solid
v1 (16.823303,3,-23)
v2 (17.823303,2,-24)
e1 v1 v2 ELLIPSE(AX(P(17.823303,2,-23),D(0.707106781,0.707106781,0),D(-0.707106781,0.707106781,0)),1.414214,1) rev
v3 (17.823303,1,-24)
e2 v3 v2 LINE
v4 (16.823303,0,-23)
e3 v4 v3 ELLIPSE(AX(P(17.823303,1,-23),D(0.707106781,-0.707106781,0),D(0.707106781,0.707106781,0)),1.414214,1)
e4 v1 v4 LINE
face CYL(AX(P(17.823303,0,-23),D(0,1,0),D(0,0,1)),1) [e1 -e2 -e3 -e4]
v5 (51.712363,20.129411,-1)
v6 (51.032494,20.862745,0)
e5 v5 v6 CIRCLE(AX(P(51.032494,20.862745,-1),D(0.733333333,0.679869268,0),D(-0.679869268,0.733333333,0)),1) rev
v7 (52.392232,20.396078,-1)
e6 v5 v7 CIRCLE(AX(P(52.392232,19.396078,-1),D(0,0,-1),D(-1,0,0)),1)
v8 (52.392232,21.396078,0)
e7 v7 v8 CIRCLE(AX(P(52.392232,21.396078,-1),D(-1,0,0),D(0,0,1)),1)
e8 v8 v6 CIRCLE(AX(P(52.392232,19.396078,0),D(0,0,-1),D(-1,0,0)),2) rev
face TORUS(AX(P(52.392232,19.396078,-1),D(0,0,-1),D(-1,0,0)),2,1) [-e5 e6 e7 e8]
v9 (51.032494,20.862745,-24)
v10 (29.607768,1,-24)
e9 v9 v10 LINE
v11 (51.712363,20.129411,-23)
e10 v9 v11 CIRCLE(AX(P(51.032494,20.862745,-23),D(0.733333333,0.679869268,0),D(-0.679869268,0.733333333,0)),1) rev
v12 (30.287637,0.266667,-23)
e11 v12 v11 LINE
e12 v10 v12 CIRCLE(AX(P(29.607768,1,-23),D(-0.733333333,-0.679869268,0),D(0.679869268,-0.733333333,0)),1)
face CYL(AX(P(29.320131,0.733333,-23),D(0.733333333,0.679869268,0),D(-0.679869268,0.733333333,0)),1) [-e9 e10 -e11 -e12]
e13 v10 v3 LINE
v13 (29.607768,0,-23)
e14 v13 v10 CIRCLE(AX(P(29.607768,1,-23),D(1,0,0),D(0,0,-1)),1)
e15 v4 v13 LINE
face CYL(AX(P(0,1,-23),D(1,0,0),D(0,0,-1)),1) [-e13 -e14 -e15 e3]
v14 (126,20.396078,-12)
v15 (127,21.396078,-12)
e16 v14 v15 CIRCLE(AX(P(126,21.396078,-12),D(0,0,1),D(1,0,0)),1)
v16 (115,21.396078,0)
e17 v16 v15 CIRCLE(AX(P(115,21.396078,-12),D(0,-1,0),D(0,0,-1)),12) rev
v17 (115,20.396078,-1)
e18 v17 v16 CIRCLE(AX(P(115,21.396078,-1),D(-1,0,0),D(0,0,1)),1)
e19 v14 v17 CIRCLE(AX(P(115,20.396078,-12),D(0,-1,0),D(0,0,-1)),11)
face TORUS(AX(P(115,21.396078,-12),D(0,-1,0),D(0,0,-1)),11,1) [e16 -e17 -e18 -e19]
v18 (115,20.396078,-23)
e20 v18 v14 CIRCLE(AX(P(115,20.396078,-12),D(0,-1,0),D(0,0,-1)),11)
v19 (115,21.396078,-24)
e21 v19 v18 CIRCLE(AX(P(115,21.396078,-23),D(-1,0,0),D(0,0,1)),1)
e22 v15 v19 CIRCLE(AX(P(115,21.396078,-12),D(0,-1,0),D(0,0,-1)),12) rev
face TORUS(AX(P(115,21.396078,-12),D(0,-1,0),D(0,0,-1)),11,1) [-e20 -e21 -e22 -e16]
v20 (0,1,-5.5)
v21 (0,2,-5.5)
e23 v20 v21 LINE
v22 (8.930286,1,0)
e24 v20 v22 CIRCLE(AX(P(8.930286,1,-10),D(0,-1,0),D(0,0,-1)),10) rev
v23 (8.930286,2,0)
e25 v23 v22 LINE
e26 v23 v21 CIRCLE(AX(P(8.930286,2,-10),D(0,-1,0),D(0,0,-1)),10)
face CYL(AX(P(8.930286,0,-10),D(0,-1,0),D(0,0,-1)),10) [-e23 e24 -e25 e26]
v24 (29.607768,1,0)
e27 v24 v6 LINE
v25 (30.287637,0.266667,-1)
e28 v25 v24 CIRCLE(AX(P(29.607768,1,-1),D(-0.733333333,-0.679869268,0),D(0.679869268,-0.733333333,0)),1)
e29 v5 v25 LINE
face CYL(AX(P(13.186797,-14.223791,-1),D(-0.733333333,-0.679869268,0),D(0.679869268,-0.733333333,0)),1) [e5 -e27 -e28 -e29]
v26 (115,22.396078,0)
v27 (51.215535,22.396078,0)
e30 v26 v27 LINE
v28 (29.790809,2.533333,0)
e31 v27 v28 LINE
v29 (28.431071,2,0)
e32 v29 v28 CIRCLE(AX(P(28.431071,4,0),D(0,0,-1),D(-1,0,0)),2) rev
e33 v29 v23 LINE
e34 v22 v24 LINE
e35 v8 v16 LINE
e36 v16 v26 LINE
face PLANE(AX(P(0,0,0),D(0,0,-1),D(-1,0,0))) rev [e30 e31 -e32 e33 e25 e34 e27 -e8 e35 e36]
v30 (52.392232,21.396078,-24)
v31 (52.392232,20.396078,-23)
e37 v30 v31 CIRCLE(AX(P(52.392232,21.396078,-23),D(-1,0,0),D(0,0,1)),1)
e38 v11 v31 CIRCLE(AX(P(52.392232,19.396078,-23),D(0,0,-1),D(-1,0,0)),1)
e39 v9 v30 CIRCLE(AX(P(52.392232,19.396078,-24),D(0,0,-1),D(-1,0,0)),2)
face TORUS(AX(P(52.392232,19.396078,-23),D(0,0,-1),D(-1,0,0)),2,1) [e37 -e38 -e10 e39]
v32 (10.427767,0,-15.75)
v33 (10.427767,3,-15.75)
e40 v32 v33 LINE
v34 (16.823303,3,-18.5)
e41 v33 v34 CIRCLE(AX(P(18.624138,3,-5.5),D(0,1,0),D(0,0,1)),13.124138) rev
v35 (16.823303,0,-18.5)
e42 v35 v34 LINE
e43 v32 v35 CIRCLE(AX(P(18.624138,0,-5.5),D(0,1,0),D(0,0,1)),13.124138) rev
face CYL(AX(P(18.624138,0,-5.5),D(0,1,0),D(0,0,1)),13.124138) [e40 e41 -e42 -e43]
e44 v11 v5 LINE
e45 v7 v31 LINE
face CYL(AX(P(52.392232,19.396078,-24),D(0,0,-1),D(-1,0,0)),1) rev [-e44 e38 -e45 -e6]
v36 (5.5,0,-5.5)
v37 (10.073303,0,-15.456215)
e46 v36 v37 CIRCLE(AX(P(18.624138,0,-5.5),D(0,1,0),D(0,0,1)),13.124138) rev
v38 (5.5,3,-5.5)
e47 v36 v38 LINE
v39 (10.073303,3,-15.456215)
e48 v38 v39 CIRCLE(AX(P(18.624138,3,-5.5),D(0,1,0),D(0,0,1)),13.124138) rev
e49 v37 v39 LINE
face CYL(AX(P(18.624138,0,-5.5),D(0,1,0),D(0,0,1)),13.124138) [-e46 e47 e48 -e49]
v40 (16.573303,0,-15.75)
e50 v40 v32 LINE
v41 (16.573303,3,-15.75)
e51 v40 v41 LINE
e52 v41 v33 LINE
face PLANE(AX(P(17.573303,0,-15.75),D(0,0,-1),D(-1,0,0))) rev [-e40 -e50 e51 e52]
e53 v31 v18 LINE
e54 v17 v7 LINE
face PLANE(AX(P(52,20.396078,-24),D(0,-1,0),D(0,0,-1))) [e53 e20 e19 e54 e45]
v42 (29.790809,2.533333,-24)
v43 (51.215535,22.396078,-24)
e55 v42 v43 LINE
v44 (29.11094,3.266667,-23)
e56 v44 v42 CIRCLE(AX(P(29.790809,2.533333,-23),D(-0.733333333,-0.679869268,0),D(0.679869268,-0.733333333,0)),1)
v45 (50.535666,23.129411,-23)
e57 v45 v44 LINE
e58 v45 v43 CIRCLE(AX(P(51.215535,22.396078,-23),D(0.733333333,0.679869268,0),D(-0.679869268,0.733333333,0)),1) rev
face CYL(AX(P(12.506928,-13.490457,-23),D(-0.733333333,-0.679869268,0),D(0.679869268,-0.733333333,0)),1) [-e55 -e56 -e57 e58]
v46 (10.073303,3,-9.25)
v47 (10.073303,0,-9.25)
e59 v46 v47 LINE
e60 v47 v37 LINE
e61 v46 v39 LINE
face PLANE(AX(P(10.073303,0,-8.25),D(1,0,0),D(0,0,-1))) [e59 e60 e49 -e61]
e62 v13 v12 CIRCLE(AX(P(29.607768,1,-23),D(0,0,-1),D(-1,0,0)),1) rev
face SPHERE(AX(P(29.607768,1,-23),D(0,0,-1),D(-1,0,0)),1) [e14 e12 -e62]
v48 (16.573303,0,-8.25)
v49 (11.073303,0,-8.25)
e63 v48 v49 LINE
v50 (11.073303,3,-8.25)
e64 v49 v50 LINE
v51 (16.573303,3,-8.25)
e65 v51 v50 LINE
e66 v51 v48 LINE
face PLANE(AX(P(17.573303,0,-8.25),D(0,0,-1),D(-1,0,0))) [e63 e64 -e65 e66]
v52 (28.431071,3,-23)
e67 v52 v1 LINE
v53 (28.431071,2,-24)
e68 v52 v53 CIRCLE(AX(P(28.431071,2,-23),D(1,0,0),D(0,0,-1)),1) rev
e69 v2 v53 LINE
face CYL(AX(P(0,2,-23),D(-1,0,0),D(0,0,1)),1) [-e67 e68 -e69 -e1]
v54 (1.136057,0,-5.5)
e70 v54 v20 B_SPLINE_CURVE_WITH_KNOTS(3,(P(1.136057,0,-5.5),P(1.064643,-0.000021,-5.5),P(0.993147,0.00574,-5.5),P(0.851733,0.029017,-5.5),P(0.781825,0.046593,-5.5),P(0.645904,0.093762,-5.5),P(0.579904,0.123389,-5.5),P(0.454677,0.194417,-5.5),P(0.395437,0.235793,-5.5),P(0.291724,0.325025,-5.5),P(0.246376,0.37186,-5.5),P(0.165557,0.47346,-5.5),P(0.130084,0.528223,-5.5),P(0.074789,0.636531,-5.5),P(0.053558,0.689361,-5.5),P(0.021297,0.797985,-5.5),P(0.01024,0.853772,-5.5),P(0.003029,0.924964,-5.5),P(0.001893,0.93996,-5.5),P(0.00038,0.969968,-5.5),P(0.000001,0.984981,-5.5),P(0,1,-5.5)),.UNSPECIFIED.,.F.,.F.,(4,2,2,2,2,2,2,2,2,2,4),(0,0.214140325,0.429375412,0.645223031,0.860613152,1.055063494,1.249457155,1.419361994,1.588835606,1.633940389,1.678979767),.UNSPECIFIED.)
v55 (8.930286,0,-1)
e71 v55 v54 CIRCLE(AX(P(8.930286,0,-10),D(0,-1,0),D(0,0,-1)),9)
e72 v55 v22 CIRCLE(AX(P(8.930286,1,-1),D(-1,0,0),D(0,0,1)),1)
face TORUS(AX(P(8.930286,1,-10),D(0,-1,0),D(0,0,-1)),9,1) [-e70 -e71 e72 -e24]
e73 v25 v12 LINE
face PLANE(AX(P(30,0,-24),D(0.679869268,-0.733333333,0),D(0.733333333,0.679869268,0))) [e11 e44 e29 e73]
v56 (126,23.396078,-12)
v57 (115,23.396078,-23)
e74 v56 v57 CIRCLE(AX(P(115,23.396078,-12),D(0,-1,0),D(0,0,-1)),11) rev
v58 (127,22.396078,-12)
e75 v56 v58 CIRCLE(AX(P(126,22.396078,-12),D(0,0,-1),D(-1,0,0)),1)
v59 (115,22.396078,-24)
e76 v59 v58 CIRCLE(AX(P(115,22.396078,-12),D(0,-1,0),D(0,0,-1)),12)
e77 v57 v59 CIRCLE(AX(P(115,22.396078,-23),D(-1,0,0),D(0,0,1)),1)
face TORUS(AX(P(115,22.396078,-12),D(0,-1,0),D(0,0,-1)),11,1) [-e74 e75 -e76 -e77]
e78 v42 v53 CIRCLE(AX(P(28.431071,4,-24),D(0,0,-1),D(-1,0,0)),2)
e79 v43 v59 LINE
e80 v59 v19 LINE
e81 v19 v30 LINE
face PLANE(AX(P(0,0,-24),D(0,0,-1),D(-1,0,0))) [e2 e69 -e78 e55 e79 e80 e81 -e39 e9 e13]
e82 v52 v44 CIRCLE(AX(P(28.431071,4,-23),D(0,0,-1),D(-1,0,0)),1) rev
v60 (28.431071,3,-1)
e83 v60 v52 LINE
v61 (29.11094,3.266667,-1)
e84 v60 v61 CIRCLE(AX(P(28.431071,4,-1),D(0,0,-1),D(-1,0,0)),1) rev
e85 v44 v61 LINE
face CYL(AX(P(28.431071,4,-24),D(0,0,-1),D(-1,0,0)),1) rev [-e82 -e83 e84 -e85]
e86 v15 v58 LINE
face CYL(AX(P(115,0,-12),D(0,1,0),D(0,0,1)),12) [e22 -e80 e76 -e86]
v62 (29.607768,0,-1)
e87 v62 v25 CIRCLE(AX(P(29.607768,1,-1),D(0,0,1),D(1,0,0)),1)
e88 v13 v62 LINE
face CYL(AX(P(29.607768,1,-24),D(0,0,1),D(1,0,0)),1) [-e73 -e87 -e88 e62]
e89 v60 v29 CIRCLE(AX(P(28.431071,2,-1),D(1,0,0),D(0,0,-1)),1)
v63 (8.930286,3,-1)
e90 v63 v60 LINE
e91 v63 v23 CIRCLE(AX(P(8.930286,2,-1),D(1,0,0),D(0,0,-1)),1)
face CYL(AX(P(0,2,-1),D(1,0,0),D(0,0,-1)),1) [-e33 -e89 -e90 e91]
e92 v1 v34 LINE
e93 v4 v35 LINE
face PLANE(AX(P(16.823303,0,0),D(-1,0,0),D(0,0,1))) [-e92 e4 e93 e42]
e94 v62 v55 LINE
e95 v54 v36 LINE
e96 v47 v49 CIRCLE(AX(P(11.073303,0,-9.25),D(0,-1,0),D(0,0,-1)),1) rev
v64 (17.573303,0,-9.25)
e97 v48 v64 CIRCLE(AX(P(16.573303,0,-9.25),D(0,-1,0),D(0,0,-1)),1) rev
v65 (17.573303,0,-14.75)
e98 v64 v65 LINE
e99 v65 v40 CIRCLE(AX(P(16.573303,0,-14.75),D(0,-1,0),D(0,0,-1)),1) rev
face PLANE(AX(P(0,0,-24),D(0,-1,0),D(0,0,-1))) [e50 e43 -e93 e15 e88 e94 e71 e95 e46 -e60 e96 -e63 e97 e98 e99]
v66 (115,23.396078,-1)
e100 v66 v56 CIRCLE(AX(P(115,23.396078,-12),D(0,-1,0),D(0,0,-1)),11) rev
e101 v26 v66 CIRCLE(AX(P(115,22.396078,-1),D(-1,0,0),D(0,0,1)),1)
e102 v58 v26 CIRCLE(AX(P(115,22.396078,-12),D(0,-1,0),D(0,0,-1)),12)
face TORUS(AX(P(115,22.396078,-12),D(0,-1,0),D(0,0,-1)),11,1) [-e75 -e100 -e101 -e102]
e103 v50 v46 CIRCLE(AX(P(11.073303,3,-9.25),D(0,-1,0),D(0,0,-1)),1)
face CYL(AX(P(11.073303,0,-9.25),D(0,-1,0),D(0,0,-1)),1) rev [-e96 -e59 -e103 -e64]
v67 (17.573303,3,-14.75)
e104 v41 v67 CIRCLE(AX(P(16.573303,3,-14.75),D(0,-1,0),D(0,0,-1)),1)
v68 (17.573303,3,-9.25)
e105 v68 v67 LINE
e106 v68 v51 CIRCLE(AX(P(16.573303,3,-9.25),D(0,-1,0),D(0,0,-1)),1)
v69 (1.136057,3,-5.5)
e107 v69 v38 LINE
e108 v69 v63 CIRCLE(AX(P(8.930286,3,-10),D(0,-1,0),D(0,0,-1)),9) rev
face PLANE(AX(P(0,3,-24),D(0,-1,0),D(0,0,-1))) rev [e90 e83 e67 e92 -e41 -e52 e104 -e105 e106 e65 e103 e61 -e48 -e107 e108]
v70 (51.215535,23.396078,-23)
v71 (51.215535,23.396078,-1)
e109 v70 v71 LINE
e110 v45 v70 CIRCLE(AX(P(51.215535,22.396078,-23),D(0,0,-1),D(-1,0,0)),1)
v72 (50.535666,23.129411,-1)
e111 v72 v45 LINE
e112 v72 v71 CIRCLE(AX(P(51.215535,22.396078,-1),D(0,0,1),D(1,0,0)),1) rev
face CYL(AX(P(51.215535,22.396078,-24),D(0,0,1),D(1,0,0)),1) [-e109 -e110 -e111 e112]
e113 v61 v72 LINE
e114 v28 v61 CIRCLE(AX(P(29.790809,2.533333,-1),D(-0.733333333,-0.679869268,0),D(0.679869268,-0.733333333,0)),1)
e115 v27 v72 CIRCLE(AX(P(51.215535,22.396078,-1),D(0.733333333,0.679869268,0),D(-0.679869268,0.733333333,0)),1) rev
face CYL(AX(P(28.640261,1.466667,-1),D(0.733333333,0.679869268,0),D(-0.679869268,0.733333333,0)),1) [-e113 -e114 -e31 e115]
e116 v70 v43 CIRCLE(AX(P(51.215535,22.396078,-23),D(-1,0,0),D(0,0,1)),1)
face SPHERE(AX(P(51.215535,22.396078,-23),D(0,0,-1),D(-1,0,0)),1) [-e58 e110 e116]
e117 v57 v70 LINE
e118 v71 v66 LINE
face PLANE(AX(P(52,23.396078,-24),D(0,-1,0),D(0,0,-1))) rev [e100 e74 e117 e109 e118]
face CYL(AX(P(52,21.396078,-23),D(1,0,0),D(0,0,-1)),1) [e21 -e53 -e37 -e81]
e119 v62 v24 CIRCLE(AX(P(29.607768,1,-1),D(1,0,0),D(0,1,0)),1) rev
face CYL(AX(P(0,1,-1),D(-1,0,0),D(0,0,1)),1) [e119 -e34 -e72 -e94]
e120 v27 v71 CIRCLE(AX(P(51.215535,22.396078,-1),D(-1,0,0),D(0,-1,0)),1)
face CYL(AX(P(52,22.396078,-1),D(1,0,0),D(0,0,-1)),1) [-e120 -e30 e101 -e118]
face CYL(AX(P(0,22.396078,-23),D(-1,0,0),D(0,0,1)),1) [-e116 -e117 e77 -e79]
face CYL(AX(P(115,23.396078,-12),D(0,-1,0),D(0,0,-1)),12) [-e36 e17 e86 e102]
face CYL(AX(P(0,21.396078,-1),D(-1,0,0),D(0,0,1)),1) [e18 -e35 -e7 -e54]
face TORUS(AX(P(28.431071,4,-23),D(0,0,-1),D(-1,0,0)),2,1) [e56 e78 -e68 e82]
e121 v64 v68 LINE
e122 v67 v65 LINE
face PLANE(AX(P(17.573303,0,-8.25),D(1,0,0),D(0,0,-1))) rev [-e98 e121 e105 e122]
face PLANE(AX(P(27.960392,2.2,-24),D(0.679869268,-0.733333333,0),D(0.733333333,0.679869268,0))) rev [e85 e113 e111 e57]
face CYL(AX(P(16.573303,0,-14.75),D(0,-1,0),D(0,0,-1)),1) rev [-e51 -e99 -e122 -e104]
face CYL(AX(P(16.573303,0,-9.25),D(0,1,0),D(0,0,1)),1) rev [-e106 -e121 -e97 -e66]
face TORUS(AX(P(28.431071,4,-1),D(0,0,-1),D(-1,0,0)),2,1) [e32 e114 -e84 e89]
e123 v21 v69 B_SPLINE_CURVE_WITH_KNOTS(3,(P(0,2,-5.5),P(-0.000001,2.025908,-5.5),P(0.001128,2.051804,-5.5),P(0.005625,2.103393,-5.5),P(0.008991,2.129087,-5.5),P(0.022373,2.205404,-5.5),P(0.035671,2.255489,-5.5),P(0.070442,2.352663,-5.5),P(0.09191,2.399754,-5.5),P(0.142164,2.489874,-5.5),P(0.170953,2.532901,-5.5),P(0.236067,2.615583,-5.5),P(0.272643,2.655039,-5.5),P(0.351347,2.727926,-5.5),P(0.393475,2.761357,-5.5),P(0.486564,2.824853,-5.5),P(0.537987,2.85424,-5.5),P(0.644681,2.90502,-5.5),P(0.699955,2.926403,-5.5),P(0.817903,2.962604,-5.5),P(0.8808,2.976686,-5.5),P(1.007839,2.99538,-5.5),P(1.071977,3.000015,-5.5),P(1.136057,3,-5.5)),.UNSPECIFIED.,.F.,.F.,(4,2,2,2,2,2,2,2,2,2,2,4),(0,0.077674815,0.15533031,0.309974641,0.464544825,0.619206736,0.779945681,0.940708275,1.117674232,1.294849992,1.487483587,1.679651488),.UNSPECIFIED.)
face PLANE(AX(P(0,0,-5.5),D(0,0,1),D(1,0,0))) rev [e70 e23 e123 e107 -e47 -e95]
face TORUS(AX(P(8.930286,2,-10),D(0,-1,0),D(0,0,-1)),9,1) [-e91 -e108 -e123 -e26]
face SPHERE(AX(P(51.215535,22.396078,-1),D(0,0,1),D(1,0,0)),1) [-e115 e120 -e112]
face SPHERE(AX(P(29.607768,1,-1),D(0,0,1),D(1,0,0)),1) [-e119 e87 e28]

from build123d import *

# Parameters (mm, degrees)
EXTRUDE_THIN1_DEPTH = 24
CUT_EXTRUDE1_DEPTH  = 131.847239176
FILLET1_R           = 10
FILLET2_R           = 12
FILLET3_R           = 1
FILLET4_R           = 1


# Some blends are built 0.0001 mm under size
with BuildPart() as part:
    # Sketch1 → Extrude-Thin1 (new body)
    with BuildSketch(Plane.XY):
        Polygon((0, 0), (30, 0), (52, 20.396078054), (127, 20.396078054), (127, 23.396078054), (50.823303189, 23.396078054), (28.823303189, 3), (0, 3), align=None)
    extrude(amount=-EXTRUDE_THIN1_DEPTH)

    # Sketch2 → Cut-Extrude1 (cut, through all)
    with BuildSketch(Plane(origin=(0, 3, 0), x_dir=(1, 0, 0), z_dir=(0, 1, 0))):
        with BuildLine():
            Line((16.823303189, 24), (0, 24))
            Line((0, 24), (0, 5.5))
            Line((0, 5.5), (5.5, 5.5))
            ThreePointArc((5.5, 5.5), (6.698004209, 10.97816866), (10.073303189, 15.456215417))
            Line((10.073303189, 15.456215417), (10.073303189, 8.25))
            Line((10.073303189, 8.25), (17.573303189, 8.25))
            Line((17.573303189, 8.25), (17.573303189, 15.75))
            Line((17.573303189, 15.75), (10.427766753, 15.75))
            ThreePointArc((10.427766753, 15.75), (13.439867838, 17.556796696), (16.823303189, 18.5))
            Line((16.823303189, 18.5), (16.823303189, 24))
        make_face()
    extrude(amount=-CUT_EXTRUDE1_DEPTH, mode=Mode.SUBTRACT)

    # Fillet1
    # the kernel refuses this fillet: 10 mm, written as the material it takes off along each edge
    with BuildSketch(Plane(origin=(0, 25.325713874, 0), x_dir=(1, 0, 0), z_dir=(0, -1, 0))) as fillet1_piece_1:
        with BuildLine():
            CenterArc((8.93028555, -10), FILLET1_R, 90, 63.25631605)
            Line((0, -5.5), (-0.178605711, -5.41))
            ThreePointArc((-0.178605711, -5.41), (-0.2, -2.75), (-0.2, 0))
            Line((-0.2, 0), (0, 0.2))
            Line((0, 0.2), (8.93028555, 0.2))
            Line((8.93028555, 0.2), (8.93028555, 0))
        make_face()
    extrude(amount=47.651427749, mode=Mode.SUBTRACT)

    # Fillet2
    fillet2_edges = [part.edges().sort_by_distance(p)[0] for p in [
        (127, 21.896078054, 0),
        (127, 21.896078054, -24),
    ]]
    fillet(fillet2_edges, radius=FILLET2_R - 0.0001)  # a hair under: the kernel refuses the full size

    # Fillet3
    fillet3_edges = [part.edges().sort_by_distance(p)[0] for p in [
        (52, 20.396078054, -12),
        (30, 0, -12),
        (28.823303189, 3, -12),
        (50.823303189, 23.396078054, -12),
        (82.911701595, 23.396078054, -24),
        (39.823303189, 13.198039027, -24),
        (23.411651595, 0, -24),
        (22.823303189, 3, -24),
        (16.823303189, 1.5, -24),
        (41, 10.198039027, -24),
        (83.50005, 20.396078054, -24),
        (18.876794369, 3, 0),
        (3.686241309, 3, -1.485306817),
        (19.465142775, 0, 0),
        (3.686241309, 0, -1.485306817),
        (123.485310664, 20.396078054, -20.485310664),
        (123.485310664, 20.396078054, -3.514689336),
        (123.485310664, 23.396078054, -20.485310664),
        (123.485310664, 23.396078054, -3.514689336),
        (41, 10.198039027, 0),
        (39.823303189, 13.198039027, 0),
        (82.911701595, 23.396078054, 0),
        (83.50005, 20.396078054, 0),
    ]]
    fillet(fillet3_edges, radius=FILLET3_R)

    # Fillet4
    fillet4_edges = [part.edges().sort_by_distance(p)[0] for p in [
        (17.573303189, 1.5, -15.75),
        (17.573303189, 1.5, -8.25),
        (10.073303189, 1.5, -8.25),
    ]]
    fillet(fillet4_edges, radius=FILLET4_R)


solid = part.part
